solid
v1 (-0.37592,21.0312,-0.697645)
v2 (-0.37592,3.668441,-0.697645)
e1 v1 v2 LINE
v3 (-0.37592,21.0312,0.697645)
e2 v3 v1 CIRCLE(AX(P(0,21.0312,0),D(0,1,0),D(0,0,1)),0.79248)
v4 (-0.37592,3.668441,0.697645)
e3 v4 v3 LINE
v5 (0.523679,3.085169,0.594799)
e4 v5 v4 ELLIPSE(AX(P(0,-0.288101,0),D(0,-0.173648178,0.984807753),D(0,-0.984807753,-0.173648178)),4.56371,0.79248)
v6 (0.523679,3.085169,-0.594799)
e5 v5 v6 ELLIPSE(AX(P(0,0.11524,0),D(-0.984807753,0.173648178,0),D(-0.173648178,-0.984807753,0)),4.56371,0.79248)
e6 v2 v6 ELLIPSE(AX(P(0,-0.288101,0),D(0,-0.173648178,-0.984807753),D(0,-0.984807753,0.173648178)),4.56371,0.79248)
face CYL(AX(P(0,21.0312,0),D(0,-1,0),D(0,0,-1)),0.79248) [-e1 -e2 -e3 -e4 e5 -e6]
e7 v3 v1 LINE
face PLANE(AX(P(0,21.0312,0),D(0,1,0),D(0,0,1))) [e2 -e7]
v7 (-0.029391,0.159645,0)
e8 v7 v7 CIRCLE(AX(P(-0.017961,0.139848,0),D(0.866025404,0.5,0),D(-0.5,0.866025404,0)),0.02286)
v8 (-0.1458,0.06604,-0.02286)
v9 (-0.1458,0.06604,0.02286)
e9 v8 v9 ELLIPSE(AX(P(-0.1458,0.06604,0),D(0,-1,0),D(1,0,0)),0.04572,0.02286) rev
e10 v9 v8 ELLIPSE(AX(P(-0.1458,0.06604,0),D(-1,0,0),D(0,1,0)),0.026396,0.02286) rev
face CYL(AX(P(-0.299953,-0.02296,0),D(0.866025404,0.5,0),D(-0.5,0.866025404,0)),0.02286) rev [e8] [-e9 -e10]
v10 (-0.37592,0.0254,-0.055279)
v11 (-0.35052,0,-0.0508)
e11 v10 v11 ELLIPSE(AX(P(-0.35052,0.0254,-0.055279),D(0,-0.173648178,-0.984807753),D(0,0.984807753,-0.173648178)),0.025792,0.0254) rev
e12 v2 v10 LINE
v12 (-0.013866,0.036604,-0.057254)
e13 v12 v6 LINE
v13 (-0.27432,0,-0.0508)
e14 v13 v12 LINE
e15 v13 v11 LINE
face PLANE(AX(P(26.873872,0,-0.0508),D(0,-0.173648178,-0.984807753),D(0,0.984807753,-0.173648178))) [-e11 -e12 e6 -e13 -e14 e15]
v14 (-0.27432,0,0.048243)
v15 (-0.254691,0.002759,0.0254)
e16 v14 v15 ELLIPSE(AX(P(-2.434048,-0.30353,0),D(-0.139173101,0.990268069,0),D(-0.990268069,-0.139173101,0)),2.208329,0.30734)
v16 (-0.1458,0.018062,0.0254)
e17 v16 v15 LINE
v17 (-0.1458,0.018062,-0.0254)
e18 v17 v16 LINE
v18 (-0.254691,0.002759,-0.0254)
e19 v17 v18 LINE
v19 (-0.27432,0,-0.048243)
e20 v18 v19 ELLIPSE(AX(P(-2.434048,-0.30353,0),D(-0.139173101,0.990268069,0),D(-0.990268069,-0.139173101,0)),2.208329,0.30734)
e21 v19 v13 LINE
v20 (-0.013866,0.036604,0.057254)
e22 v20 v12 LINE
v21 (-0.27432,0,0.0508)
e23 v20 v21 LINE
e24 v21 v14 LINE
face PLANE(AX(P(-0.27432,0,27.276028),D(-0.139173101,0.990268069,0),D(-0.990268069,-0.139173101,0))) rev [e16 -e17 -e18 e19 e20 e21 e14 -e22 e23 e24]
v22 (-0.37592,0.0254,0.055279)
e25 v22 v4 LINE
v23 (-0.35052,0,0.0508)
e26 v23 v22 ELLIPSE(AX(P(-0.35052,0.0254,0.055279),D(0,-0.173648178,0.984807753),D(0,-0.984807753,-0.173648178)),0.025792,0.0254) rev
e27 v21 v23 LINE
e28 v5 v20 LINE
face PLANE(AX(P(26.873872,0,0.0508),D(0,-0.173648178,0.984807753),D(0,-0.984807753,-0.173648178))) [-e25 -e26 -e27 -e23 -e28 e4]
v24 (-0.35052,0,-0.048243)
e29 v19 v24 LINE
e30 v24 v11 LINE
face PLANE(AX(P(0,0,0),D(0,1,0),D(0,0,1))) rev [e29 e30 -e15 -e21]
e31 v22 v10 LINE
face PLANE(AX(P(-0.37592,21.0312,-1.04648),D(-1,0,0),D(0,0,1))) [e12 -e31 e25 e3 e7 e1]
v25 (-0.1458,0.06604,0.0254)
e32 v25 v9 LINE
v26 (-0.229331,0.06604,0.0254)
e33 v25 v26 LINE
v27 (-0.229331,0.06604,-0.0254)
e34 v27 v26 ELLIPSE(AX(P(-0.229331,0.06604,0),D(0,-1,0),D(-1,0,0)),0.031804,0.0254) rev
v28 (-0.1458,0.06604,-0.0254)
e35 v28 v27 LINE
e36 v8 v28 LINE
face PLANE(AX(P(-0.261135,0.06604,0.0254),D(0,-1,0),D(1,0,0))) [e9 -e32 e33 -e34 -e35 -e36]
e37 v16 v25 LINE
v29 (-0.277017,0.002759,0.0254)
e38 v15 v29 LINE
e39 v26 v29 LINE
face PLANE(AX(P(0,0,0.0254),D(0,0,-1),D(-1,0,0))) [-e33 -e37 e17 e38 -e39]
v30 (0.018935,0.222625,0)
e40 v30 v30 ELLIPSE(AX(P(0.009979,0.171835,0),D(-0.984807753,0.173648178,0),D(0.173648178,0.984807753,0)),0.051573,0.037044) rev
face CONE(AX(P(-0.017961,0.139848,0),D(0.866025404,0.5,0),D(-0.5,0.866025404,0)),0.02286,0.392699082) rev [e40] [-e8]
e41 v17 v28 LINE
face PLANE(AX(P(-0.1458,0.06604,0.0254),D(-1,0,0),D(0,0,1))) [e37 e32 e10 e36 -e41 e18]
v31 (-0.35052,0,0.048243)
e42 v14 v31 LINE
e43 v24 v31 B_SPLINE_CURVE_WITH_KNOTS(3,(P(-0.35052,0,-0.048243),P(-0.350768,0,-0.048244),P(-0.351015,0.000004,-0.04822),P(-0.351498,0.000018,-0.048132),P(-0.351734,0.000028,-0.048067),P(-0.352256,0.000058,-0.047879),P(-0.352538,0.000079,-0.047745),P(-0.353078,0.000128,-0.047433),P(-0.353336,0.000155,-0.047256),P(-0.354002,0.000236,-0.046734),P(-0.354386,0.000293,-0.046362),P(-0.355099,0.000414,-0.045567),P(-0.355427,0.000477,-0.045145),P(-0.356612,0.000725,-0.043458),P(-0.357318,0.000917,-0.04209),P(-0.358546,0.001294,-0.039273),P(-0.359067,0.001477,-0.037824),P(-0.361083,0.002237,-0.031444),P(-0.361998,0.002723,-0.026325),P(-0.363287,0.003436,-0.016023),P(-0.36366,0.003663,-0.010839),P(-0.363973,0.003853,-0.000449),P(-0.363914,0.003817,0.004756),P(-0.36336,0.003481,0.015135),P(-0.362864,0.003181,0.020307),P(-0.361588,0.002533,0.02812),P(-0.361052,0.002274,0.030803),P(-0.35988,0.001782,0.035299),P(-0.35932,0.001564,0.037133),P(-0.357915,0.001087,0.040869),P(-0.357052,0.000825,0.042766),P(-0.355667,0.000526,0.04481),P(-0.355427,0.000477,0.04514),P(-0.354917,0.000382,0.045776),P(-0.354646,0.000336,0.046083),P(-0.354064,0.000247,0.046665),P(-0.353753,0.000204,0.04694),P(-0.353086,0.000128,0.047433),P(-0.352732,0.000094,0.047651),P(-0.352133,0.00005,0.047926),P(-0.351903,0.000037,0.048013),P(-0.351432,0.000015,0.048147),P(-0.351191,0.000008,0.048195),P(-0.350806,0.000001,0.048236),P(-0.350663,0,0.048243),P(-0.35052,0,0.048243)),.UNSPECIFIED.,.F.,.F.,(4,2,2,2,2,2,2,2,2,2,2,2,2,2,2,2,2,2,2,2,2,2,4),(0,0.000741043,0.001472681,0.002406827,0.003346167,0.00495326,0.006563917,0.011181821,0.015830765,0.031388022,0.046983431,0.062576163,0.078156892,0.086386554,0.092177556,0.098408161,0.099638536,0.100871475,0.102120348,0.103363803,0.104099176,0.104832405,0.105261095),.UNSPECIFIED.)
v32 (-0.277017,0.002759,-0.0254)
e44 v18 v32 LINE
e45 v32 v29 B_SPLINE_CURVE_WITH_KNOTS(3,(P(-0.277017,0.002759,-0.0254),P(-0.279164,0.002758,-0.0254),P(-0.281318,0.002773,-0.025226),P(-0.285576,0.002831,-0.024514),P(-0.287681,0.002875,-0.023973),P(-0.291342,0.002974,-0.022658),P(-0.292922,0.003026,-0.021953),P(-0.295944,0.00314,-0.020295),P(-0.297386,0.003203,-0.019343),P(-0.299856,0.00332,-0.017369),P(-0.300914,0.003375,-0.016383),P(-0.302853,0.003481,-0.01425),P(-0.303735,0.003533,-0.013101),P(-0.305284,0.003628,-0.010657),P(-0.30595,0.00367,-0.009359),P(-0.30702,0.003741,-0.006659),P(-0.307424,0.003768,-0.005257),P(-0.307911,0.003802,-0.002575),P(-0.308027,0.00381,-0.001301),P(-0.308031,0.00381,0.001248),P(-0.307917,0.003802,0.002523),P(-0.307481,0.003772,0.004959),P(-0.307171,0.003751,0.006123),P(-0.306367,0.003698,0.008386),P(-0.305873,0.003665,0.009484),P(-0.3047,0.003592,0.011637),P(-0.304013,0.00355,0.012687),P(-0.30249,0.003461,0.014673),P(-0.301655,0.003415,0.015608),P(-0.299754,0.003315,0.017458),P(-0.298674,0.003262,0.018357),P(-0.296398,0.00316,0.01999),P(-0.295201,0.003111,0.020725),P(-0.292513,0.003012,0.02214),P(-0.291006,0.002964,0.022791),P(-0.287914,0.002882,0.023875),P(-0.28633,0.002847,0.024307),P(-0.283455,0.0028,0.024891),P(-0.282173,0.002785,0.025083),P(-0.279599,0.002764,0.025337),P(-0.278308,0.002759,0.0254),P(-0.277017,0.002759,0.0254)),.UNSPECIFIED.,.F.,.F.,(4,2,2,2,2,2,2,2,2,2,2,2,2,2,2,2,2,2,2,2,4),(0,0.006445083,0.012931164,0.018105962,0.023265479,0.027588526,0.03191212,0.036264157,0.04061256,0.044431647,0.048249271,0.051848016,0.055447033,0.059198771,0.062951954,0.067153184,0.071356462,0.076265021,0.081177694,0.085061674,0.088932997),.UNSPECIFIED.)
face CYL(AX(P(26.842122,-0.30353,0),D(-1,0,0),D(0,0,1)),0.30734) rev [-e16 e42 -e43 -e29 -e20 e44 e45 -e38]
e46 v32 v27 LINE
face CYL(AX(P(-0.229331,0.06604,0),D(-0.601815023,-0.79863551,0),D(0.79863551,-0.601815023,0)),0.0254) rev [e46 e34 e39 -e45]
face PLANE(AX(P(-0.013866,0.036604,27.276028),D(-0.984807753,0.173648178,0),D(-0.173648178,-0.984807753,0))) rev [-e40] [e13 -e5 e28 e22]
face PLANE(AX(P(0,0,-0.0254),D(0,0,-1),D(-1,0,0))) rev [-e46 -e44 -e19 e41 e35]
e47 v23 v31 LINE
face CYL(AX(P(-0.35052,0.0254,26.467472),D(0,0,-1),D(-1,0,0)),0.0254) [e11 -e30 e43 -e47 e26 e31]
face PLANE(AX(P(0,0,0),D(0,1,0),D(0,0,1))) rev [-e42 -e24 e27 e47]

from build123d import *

# Parameters (mm, degrees)
TD_SKETCH_R                             = 0.79248
TL_FEATURE_DEPTH                        = 21.0312
TDF_STD_SKETCH_W                        = 2.09296
TDF_STD_SKETCH_H                        = 2.09296
TDF_STD_FEATURE_DEPTH                   = 22.061040395
ISA_20_STD_FEATURE_DEPTH                = 22.061040395
ISA_20_STD_FEATURE_DEPTH_BACK           = 22.061040395
F_10BA_STD_FEATURE_DEPTH                = 22.061040395
F_10BA_STD_FEATURE_DEPTH_BACK           = 22.061040395
FRO_STD_FEATURE_DEPTH                   = 22.061040395
FRO_STD_FEATURE_DEPTH_BACK              = 22.061040395
C_STD_FEATURE_DEPTH                     = 22.061040395
C_STD_FEATURE_DEPTH_BACK                = 22.061040395
ERW_STD_FEATURE_DEPTH                   = 0.0254
H_STD_FEATURE_REACH                     = 22.922
H_STD_SKETCH_R                          = 0.02286
H_STD_SKETCH_3_R                        = 0.02286
FUNNEL_FINAL_DIAMETRE_STD_FEATURE_DEPTH = 2.499995
FUNNEL_FINAL_DIAMETRE_STD_FEATURE_DRAFT = -22.5
ROUND_BR_STD_FEATURE_START              = -1
ROUND_BR_STD_FEATURE_DEPTH              = 0.96499722


with BuildPart() as part:
    # TD_sketch → TL_feature (new body)
    with BuildSketch(Plane(origin=(0, 0, 0), x_dir=(1, 0, 0), z_dir=(0, 1, 0))):
        with Locations(Location((0, 0, 0), (0, 0, 270))):
            Circle(TD_SKETCH_R)
    extrude(amount=TL_FEATURE_DEPTH)

    # TDF_STD_sketch → TDF_STD_feature (cut, through all)
    with BuildSketch(Plane(origin=(0, 0, 0), x_dir=(1, 0, 0), z_dir=(0, 1, 0))):
        with Locations((-1.4224, 0)):
            Rectangle(TDF_STD_SKETCH_W, TDF_STD_SKETCH_H)
    extrude(amount=TDF_STD_FEATURE_DEPTH, mode=Mode.SUBTRACT)

    # ISA_20_STD_sketch → ISA_20_STD_feature (cut, two sides: drawn at the far end of the back side and taken through both)
    with BuildSketch(Plane(origin=(0, 0, 0), x_dir=(0, 0, -1), z_dir=(1, 0, 0)).offset(-ISA_20_STD_FEATURE_DEPTH_BACK)):
        Polygon((-12.968809457, 73.261672178), (-3.759167997, 21.0312), (-0.0508, 0), (0.0508, 0), (3.759167997, 21.0312), (12.968809457, 73.261672178), (12.968809457, -32.810750623), (-12.968809457, -32.810750623), align=None)
    extrude(amount=ISA_20_STD_FEATURE_DEPTH + ISA_20_STD_FEATURE_DEPTH_BACK, mode=Mode.SUBTRACT)

    # 10BA_STD_sketch → 10BA_STD_feature (cut, two sides: drawn at the far end of the back side and taken through both)
    with BuildSketch(Plane.XY.offset(-F_10BA_STD_FEATURE_DEPTH_BACK)):
        Polygon((-53.216424634, 0), (-0.37592, 0), (-0.27432, 0), (-0.013865644, 0.036604473), (3.688047997, 21.0312), (12.863705333, 73.068938636), (91.245889802, 2.18375769), (25.165759835, -70.885180946), align=None)
    extrude(amount=F_10BA_STD_FEATURE_DEPTH + F_10BA_STD_FEATURE_DEPTH_BACK, mode=Mode.SUBTRACT)

    # FRO_STD_sketch → FRO_STD_feature (cut, two sides: drawn at the far end of the back side and taken through both)
    with BuildSketch(Plane.XY.offset(-FRO_STD_FEATURE_DEPTH_BACK)):
        with BuildLine():
            Line((-0.37592, 52.149873762), (-0.37592, 0.0254))
            ThreePointArc((-0.37592, 0.0254), (-0.368480512, 0.007439488), (-0.35052, 0))
            Line((-0.35052, 0), (51.773953762, 0))
            Line((51.773953762, 0), (-21.941183964, -73.715137726))
            Line((-21.941183964, -73.715137726), (-74.091057726, -21.565263964))
            Line((-74.091057726, -21.565263964), (-0.37592, 52.149873762))
        make_face()
    extrude(amount=FRO_STD_FEATURE_DEPTH + FRO_STD_FEATURE_DEPTH_BACK, mode=Mode.SUBTRACT)

    # C_STD_sketch → C_STD_feature (cut, two sides: drawn at the far end of the back side and taken through both)
    with BuildSketch(Plane(origin=(0, 0, 0), x_dir=(0, 0, -1), z_dir=(1, 0, 0)).offset(-C_STD_FEATURE_DEPTH_BACK)):
        with BuildLine():
            Line((-51.498419713, -8.177529753), (-0.048243287, 0))
            ThreePointArc((-0.048243287, 0), (0, 0.00381), (0.048243287, 0))
            Line((0.048243287, 0), (51.498419713, -8.177529753))
            Line((51.498419713, -8.177529753), (51.498419713, -112.369518834))
            Line((51.498419713, -112.369518834), (-51.498419713, -112.369518834))
            Line((-51.498419713, -112.369518834), (-51.498419713, -8.177529753))
        make_face()
    extrude(amount=C_STD_FEATURE_DEPTH + C_STD_FEATURE_DEPTH_BACK, mode=Mode.SUBTRACT)


with BuildPart() as body_2:
    # ERW_STD_sketch → ERW_STD_feature (new, symmetric)
    with BuildSketch(Plane.XY):
        Polygon((-0.145800064, 0.06604), (-0.145800064, 0), (-0.310900064, 0), (-0.261135355, 0.06604), align=None)
    extrude(amount=ERW_STD_FEATURE_DEPTH, both=True)

    # H_STD_sketch → H_STD_feature (add, up to next)
    with BuildSketch(Plane(origin=(-0.017961309, 0.13984774, 0), x_dir=(0, 0, -1), z_dir=(0.8660254037844415, 0.4999999999999953, 0)), mode=Mode.PRIVATE) as h_std_feature_sk1:
        with Locations(Location((0, 0, 0), (0, 0, 90))):
            Circle(H_STD_SKETCH_R)
    h_std_feature_tool1 = extrude(h_std_feature_sk1.sketch, amount=-H_STD_FEATURE_REACH, mode=Mode.PRIVATE) - body_2.part
    add(h_std_feature_tool1.solids().sort_by_distance((-0.017961, 0.139848, 0))[0])


with BuildPart() as funnel_final_diametre_std_feature_tool:
    # H_STD_sketch<3> → funnel_final_diametre_STD_feature (with draft: the straight prism first)
    with BuildSketch(Plane(origin=(-0.017961309, 0.13984774, 0), x_dir=(0, 0, -1), z_dir=(0.8660254037844415, 0.4999999999999953, 0))):
        with Locations(Location((0, 0, 0), (0, 0, 90))):
            Circle(H_STD_SKETCH_3_R)
    extrude(amount=FUNNEL_FINAL_DIAMETRE_STD_FEATURE_DEPTH)
    # funnel_final_diametre_STD_feature: the draft: its side faces are tilted about the plane it starts from
    funnel_final_diametre_std_feature_sides = [funnel_final_diametre_std_feature_tool.faces().sort_by_distance(p)[0] for p in [
        (1.075998281, 0.745049149, 0),
    ]]
    draft(funnel_final_diametre_std_feature_sides, Plane(origin=(-0.017961309, 0.13984774, 0), x_dir=(0, 0, -1), z_dir=(0.8660254037844415, 0.4999999999999953, 0)), FUNNEL_FINAL_DIAMETRE_STD_FEATURE_DRAFT)


with BuildPart() as body_2_1:
    add(body_2.part)

    # funnel_final_diametre_STD_feature: add funnel_final_diametre_std_feature_tool
    add(funnel_final_diametre_std_feature_tool.part)

    # ROUND_BR_STD_feature: read off the stored shape, not the designer's step
    # ROUND_BR_STD_feature outline → ROUND_BR_STD_feature (cut)
    with BuildSketch(Plane(origin=(0, 0, 0), x_dir=(0.79863551004729, -0.601815023152052, 0), z_dir=(0.601815023152052, 0.79863551004729, 0)).offset(ROUND_BR_STD_FEATURE_START)):
        with BuildLine():
            Line((-0.248295831, -0.0254), (-0.222895831, -0.0254))
            ThreePointArc((-0.222895831, -0.0254), (-0.240856343, -0.017960512), (-0.248295831, 0))
            Line((-0.248295831, 0), (-0.248295831, -0.0254))
        make_face()
        with BuildLine():
            Line((-0.248295831, 0.0254), (-0.248295831, 0))
            ThreePointArc((-0.248295831, 0), (-0.240856343, 0.017960512), (-0.222895831, 0.0254))
            Line((-0.222895831, 0.0254), (-0.248295831, 0.0254))
        make_face()
    extrude(amount=ROUND_BR_STD_FEATURE_DEPTH, mode=Mode.SUBTRACT)


with BuildPart() as part_1:
    add(part.part)

    # COMBINE_STD_feature: cut body 2
    add(body_2_1.part, mode=Mode.SUBTRACT)


solid = part_1.part
